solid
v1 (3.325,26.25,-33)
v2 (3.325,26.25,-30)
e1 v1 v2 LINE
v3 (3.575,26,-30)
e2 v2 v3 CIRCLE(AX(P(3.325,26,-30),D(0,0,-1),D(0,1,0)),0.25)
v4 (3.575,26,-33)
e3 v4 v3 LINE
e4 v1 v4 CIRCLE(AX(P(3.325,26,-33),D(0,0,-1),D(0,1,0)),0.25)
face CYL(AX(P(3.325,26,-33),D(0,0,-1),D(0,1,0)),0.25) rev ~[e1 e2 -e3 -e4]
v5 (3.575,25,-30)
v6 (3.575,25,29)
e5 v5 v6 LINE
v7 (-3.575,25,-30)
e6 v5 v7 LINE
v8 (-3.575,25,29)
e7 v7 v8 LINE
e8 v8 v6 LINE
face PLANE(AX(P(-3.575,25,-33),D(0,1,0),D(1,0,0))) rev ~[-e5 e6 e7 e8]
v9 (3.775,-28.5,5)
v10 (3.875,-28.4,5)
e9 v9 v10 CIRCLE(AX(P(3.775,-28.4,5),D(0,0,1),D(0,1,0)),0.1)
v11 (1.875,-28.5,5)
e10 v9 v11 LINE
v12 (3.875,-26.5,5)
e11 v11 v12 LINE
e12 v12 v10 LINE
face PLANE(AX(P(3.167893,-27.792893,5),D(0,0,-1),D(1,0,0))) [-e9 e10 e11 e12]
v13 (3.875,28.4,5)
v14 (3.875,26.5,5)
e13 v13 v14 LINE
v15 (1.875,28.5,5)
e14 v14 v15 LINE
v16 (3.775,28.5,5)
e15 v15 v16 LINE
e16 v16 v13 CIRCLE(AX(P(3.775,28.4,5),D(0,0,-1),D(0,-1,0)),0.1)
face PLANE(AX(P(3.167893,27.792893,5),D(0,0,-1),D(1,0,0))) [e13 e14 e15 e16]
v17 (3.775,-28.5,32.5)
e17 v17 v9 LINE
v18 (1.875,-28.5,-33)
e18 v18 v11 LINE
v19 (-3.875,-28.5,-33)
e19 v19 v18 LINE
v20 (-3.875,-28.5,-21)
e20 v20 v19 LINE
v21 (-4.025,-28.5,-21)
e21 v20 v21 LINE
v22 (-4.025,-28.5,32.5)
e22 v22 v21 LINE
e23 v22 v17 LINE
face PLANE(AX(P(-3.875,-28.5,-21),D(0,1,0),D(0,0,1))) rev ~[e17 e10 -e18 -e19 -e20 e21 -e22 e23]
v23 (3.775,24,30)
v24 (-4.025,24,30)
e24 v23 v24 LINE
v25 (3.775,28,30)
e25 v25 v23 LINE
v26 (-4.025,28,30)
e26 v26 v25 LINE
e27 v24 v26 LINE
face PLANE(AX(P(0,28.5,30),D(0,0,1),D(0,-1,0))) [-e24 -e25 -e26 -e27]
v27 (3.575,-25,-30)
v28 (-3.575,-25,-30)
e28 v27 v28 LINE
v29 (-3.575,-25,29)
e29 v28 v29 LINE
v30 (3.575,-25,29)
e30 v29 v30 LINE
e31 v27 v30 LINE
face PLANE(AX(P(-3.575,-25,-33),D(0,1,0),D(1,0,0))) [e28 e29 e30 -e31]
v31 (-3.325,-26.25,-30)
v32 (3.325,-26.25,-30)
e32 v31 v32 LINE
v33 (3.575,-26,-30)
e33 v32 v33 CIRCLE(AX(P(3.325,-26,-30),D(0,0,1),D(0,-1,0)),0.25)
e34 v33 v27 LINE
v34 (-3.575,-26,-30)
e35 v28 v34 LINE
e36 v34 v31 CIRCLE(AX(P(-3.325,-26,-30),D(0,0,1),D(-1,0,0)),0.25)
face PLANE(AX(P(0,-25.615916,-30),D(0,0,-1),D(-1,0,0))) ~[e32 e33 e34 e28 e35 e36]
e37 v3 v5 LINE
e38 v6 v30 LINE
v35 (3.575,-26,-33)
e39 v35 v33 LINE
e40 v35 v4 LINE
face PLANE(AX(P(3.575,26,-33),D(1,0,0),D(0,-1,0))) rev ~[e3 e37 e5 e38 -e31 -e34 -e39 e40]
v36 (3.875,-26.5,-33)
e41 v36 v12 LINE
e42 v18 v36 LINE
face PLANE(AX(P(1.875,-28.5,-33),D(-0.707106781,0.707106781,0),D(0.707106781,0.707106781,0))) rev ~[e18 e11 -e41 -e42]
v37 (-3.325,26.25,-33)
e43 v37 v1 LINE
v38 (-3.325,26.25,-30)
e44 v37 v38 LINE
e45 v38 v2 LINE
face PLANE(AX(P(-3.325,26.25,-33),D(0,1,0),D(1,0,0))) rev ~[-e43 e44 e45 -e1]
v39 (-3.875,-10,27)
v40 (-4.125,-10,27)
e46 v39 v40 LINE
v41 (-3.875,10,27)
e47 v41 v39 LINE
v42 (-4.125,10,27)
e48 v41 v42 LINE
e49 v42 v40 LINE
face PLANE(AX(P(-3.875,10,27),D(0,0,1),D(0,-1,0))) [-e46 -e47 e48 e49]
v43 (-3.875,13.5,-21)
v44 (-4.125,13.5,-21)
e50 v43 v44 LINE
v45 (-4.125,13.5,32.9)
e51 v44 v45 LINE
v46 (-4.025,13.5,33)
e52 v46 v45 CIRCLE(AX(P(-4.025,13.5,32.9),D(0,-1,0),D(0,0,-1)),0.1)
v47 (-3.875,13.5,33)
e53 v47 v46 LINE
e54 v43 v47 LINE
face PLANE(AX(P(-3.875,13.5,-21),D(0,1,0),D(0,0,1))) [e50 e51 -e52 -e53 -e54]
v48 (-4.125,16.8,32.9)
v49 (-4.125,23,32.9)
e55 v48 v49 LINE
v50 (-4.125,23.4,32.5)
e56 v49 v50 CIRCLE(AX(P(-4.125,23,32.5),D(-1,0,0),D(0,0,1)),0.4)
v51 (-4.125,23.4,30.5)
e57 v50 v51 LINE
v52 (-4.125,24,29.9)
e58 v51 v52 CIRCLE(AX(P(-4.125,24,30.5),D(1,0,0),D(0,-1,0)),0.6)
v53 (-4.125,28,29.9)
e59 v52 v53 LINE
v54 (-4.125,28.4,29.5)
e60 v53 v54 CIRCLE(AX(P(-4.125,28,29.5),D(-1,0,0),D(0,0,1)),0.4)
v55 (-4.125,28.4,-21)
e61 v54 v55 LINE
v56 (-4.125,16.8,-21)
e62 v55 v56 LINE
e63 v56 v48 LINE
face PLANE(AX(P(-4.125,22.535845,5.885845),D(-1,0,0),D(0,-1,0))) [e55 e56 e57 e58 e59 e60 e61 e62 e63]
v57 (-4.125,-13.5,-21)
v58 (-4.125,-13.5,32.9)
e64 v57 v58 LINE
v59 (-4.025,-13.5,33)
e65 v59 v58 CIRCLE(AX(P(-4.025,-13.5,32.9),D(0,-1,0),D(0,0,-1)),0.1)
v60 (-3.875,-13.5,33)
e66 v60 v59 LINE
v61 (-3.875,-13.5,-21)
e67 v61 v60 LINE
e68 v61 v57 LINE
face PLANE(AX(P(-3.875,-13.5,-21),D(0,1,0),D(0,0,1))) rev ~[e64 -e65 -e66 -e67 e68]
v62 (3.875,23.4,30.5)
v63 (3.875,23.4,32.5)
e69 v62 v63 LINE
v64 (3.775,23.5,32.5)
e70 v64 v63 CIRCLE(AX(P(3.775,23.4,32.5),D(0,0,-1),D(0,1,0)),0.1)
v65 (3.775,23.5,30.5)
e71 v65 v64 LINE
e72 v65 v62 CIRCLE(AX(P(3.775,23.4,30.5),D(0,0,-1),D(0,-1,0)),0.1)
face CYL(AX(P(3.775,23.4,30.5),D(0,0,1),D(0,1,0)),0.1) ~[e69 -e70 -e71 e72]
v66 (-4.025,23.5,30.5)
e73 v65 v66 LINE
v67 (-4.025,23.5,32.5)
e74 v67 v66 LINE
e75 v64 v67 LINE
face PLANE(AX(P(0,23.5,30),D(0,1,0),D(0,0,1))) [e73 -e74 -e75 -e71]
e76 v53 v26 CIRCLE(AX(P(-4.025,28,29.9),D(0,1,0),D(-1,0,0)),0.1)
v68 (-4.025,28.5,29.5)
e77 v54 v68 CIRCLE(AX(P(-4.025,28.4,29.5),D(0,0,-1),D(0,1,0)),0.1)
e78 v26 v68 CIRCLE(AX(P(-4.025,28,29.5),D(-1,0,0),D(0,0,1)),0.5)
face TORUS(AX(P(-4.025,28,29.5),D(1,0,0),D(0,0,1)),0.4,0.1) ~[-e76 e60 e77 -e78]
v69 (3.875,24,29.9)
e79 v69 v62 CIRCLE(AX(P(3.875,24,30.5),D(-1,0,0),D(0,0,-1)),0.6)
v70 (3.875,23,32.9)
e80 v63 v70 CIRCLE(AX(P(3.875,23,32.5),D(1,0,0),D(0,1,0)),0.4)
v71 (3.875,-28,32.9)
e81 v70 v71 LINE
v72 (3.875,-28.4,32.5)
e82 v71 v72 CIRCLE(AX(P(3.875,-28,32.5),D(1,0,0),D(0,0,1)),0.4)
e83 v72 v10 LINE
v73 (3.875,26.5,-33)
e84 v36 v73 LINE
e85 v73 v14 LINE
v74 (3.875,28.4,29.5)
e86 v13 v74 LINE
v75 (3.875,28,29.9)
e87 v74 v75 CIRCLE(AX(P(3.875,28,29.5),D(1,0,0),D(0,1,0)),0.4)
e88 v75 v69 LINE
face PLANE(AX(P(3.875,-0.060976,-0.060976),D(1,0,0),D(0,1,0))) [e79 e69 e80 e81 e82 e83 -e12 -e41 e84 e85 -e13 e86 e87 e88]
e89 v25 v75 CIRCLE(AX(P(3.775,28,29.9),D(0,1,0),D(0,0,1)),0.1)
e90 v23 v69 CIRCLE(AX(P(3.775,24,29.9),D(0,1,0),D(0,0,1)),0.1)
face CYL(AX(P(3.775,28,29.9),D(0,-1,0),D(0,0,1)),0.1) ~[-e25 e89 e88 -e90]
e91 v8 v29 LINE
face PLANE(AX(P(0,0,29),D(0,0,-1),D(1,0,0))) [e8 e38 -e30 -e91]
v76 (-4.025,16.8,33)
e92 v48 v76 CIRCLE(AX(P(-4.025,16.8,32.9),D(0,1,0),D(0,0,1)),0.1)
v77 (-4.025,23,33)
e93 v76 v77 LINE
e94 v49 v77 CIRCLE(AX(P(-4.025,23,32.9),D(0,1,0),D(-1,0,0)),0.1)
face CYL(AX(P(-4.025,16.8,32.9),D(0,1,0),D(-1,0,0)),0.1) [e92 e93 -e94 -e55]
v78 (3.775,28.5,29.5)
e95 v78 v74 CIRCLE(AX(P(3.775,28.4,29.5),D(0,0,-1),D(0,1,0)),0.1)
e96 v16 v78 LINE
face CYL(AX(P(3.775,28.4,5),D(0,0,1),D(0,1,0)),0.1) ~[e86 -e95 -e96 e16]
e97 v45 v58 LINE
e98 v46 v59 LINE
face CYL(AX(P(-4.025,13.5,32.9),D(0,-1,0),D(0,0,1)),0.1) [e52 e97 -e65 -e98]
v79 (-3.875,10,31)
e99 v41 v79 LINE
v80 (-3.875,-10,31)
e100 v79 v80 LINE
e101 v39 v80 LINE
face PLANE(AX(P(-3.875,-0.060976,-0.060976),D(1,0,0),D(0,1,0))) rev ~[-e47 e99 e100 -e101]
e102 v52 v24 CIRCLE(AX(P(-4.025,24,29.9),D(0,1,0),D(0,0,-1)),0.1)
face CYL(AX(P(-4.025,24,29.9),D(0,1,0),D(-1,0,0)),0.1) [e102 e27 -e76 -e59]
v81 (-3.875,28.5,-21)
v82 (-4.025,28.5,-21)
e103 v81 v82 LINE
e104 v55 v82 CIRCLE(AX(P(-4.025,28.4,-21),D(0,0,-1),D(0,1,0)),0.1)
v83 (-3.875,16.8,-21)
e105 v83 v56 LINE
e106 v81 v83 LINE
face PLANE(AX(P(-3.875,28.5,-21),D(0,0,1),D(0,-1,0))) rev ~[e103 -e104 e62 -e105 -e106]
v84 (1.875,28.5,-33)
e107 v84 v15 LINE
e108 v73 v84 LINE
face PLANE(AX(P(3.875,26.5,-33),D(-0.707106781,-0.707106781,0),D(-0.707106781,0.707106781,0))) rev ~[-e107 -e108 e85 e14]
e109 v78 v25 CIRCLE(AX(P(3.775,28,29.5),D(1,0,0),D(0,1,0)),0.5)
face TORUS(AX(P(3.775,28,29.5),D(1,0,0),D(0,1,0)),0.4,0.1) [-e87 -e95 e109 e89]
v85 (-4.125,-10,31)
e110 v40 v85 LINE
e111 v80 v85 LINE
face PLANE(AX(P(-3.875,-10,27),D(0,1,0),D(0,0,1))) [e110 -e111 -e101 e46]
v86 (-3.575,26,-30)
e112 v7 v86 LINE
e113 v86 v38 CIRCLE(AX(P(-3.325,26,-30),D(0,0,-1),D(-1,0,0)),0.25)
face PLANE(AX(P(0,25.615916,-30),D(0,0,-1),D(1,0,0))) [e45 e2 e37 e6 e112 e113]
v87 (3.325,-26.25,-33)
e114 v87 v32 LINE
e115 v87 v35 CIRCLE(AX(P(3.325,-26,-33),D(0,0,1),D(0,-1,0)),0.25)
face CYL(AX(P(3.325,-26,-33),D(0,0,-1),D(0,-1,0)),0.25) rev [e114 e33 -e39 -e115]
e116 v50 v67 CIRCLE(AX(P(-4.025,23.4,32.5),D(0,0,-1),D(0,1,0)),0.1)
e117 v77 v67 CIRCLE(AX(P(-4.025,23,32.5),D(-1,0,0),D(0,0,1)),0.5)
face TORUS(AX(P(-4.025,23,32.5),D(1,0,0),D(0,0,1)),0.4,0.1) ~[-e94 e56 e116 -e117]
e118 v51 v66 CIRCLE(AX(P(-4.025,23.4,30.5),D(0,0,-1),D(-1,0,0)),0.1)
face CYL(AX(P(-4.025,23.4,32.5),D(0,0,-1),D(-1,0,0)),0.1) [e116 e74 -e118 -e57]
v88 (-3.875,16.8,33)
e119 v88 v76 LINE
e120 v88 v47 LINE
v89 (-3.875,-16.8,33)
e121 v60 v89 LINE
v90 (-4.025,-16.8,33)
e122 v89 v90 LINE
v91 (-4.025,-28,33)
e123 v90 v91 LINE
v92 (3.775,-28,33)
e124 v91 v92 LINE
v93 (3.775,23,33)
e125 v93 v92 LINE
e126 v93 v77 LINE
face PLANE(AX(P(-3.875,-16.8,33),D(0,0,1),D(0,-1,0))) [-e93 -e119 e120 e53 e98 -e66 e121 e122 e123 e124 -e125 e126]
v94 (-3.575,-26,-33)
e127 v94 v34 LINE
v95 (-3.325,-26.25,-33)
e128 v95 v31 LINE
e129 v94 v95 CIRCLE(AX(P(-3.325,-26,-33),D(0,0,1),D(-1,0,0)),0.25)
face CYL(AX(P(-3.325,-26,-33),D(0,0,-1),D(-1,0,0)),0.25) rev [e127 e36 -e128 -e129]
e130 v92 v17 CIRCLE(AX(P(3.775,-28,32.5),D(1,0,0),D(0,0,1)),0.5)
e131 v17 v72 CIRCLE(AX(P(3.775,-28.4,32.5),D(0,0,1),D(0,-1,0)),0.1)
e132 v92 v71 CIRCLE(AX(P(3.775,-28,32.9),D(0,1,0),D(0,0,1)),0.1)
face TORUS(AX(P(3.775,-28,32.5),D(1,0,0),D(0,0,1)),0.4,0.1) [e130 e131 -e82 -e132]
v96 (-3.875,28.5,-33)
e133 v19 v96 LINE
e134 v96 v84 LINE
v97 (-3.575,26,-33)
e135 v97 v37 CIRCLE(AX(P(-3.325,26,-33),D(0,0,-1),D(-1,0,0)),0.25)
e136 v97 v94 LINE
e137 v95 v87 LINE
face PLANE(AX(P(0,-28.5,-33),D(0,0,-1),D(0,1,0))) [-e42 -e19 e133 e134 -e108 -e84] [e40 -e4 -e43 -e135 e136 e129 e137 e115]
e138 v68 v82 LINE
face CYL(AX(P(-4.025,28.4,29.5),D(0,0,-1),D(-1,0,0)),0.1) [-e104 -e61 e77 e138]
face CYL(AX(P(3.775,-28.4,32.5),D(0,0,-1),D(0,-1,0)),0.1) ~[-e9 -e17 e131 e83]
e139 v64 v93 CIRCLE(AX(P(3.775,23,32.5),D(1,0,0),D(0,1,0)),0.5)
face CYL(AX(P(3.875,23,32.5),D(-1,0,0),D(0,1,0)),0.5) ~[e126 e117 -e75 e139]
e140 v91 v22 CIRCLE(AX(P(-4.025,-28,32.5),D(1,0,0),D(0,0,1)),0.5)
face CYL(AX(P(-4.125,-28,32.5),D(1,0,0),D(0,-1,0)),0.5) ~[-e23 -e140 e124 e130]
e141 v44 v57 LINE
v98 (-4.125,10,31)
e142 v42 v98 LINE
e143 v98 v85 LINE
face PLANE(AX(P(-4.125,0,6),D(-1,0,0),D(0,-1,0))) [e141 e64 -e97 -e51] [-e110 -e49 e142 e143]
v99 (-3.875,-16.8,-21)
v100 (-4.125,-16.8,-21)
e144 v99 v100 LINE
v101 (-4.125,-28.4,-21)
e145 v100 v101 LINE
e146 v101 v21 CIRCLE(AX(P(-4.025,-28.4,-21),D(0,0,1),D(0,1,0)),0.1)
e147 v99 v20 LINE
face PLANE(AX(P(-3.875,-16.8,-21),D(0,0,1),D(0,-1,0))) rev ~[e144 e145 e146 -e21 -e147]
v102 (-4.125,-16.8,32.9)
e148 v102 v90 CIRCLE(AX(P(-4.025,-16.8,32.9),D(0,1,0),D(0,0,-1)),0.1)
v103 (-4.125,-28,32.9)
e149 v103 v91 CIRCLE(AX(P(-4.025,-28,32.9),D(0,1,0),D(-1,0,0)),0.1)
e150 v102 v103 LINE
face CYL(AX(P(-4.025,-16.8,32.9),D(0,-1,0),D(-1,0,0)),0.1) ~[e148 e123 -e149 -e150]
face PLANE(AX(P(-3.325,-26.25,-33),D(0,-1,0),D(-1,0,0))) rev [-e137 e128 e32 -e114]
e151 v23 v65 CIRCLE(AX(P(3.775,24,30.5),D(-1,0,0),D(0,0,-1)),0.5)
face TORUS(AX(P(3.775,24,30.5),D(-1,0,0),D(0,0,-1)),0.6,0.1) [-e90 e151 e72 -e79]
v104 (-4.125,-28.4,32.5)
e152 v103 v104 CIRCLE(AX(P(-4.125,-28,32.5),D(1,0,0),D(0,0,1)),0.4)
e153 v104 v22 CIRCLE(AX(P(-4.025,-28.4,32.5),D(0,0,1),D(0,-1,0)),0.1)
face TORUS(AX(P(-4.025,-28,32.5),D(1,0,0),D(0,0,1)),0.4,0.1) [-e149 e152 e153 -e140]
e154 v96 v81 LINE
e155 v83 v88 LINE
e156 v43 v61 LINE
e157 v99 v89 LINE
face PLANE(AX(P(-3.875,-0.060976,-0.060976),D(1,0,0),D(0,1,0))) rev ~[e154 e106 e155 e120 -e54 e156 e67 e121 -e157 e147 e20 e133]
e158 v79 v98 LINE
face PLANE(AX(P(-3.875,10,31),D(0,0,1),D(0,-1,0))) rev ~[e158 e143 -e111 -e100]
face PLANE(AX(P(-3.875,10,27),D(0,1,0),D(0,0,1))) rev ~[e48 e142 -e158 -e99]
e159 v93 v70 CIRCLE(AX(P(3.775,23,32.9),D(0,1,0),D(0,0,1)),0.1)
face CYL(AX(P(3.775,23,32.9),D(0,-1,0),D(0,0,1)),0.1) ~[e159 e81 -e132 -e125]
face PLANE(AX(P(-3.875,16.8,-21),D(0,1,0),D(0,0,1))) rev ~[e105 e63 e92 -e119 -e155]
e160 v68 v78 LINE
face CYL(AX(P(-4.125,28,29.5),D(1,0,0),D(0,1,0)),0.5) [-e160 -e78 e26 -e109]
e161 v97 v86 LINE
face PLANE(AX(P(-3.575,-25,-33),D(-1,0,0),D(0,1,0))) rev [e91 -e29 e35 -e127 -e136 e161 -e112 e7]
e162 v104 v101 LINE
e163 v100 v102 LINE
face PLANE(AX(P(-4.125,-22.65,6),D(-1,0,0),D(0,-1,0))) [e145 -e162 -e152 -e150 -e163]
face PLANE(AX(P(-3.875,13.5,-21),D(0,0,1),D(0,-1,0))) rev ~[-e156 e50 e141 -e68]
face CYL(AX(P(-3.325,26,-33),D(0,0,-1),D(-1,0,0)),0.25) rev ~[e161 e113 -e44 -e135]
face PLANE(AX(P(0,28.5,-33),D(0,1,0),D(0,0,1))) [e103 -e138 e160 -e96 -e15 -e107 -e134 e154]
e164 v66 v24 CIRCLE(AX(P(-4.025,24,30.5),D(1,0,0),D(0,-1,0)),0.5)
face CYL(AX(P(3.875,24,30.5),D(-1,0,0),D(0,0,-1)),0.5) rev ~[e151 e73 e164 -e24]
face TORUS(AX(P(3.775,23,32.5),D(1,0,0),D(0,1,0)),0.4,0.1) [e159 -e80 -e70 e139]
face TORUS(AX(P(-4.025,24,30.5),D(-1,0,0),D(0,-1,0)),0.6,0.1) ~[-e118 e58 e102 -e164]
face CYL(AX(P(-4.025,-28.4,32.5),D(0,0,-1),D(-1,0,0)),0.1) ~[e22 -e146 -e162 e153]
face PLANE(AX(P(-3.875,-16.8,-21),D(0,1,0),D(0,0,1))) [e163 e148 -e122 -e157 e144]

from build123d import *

# Parameters (mm, degrees)
F1_DEPTH  = 3.875
F3_DEPTH  = 38
F4_W      = 27
F4_H      = 54
F4_W_2    = 20
F4_H_2    = 4
F4_W_3    = 11.7
F5_DEPTH  = 0.25
F8_R      = 0.5
F9_R      = 0.1
F11_W     = 7.15
F11_H     = 50
F12_DEPTH = 62
F14_DEPTH = 3


# Not quite as in the source:
# - a pattern or mirror of a feature is missing from the dataset's text; its kind, count and spacing are read off the source's solid


with BuildPart() as f1:
    # F0 (on Right) → F1 (new body, symmetric)
    with BuildSketch(Plane.YZ):
        Polygon((23.5, 33), (-28.5, 33), (-28.5, -33), (28.5, -33), (28.5, 30), (23.5, 30), align=None)
    extrude(amount=F1_DEPTH, both=True)

    # F2 (on face) → F3 (cut)
    with BuildSketch(Plane(origin=(0, 0, -33), x_dir=(1, 0, 0), z_dir=(0, 0, -1))):
        Polygon((3.875, 28.5), (1.875, 28.5), (3.875, 26.5), align=None)
        Polygon((3.875, -26.5), (1.875, -28.5), (3.875, -28.5), align=None)
    extrude(amount=-F3_DEPTH, mode=Mode.SUBTRACT)

    # F4 (on face) → F5 (join)
    with BuildSketch(Plane(origin=(-3.875, 0, 0), x_dir=(0, -1, 0), z_dir=(-1, 0, 0))):
        with Locations((0, 6)):
            Rectangle(F4_W, F4_H)
        with Locations((0, 29)):
            Rectangle(F4_W_2, F4_H_2, mode=Mode.SUBTRACT)
        with Locations((22.65, 6)):
            Rectangle(F4_W_3, F4_H)
        Polygon((-28.5, 30), (-28.5, -21), (-16.8, -21), (-16.8, 33), (-23.5, 33), (-23.5, 30), align=None)
    extrude(amount=F5_DEPTH)

    # F8
    f8_edges = [f1.edges().sort_by_distance(p)[0] for p in [
        (-0.125, 23.5, 33),
        (-0.125, 23.5, 30),
        (-0.125, 28.5, 30),
        (-0.125, -28.5, 33),
    ]]
    fillet(f8_edges, radius=F8_R)

    # F9
    f9_edges = [f1.edges().sort_by_distance(p)[0] for p in [
        (3.875, -2.5, 33),
        (3.875, 26, 30),
        (-4.125, 26, 30),
        (-4.125, 23.5, 31.5),
        (3.875, 23.5, 31.5),
        (-4.125, 19.9, 33),
        (-4.125, 0, 33),
        (-4.125, -22.4, 33),
        (-4.125, -28.5, 5.75),
        (3.875, -28.5, 18.75),
        (-4.125, 28.5, 4.25),
        (-4.125, -28.353553, 32.853553),
        (3.875, -28.353553, 32.853553),
        (3.875, 23.646447, 30.146447),
        (3.875, 23.353553, 32.853553),
        (3.875, 28.353553, 29.853553),
        (3.875, 28.5, 17.25),
        (-4.125, 23.353553, 32.853553),
        (-4.125, 28.353553, 29.853553),
        (-4.125, 23.646447, 30.146447),
    ]]
    fillet(f9_edges, radius=F9_R)

    # F11 (on face) → F12 (cut)
    with BuildSketch(Plane(origin=(0, 0, -33), x_dir=(1, 0, 0), z_dir=(0, 0, -1))):
        Rectangle(F11_W, F11_H)
    extrude(amount=-F12_DEPTH, mode=Mode.SUBTRACT)

    # F13 (on face) → F14 (cut)
    with BuildSketch(Plane(origin=(0, 0, -33), x_dir=(1, 0, 0), z_dir=(0, 0, -1))):
        with BuildLine():
            Line((3.575, -25), (-3.575, -25))
            Line((-3.575, -25), (-3.575, -26))
            ThreePointArc((-3.575, -26), (-3.5017766953, -26.1767766953), (-3.325, -26.25))
            Line((-3.325, -26.25), (3.325, -26.25))
            ThreePointArc((3.325, -26.25), (3.5017766953, -26.1767766953), (3.575, -26))
            Line((3.575, -26), (3.575, -25))
        make_face()
    f14 = extrude(amount=-F14_DEPTH, mode=Mode.SUBTRACT)

    # F14_copies: F14 across plane
    add(f14.mirror(Plane(origin=(0, 0, 0), x_dir=(0, 0, -1), z_dir=(0, -1, 0))), mode=Mode.SUBTRACT)


solid = f1.part
